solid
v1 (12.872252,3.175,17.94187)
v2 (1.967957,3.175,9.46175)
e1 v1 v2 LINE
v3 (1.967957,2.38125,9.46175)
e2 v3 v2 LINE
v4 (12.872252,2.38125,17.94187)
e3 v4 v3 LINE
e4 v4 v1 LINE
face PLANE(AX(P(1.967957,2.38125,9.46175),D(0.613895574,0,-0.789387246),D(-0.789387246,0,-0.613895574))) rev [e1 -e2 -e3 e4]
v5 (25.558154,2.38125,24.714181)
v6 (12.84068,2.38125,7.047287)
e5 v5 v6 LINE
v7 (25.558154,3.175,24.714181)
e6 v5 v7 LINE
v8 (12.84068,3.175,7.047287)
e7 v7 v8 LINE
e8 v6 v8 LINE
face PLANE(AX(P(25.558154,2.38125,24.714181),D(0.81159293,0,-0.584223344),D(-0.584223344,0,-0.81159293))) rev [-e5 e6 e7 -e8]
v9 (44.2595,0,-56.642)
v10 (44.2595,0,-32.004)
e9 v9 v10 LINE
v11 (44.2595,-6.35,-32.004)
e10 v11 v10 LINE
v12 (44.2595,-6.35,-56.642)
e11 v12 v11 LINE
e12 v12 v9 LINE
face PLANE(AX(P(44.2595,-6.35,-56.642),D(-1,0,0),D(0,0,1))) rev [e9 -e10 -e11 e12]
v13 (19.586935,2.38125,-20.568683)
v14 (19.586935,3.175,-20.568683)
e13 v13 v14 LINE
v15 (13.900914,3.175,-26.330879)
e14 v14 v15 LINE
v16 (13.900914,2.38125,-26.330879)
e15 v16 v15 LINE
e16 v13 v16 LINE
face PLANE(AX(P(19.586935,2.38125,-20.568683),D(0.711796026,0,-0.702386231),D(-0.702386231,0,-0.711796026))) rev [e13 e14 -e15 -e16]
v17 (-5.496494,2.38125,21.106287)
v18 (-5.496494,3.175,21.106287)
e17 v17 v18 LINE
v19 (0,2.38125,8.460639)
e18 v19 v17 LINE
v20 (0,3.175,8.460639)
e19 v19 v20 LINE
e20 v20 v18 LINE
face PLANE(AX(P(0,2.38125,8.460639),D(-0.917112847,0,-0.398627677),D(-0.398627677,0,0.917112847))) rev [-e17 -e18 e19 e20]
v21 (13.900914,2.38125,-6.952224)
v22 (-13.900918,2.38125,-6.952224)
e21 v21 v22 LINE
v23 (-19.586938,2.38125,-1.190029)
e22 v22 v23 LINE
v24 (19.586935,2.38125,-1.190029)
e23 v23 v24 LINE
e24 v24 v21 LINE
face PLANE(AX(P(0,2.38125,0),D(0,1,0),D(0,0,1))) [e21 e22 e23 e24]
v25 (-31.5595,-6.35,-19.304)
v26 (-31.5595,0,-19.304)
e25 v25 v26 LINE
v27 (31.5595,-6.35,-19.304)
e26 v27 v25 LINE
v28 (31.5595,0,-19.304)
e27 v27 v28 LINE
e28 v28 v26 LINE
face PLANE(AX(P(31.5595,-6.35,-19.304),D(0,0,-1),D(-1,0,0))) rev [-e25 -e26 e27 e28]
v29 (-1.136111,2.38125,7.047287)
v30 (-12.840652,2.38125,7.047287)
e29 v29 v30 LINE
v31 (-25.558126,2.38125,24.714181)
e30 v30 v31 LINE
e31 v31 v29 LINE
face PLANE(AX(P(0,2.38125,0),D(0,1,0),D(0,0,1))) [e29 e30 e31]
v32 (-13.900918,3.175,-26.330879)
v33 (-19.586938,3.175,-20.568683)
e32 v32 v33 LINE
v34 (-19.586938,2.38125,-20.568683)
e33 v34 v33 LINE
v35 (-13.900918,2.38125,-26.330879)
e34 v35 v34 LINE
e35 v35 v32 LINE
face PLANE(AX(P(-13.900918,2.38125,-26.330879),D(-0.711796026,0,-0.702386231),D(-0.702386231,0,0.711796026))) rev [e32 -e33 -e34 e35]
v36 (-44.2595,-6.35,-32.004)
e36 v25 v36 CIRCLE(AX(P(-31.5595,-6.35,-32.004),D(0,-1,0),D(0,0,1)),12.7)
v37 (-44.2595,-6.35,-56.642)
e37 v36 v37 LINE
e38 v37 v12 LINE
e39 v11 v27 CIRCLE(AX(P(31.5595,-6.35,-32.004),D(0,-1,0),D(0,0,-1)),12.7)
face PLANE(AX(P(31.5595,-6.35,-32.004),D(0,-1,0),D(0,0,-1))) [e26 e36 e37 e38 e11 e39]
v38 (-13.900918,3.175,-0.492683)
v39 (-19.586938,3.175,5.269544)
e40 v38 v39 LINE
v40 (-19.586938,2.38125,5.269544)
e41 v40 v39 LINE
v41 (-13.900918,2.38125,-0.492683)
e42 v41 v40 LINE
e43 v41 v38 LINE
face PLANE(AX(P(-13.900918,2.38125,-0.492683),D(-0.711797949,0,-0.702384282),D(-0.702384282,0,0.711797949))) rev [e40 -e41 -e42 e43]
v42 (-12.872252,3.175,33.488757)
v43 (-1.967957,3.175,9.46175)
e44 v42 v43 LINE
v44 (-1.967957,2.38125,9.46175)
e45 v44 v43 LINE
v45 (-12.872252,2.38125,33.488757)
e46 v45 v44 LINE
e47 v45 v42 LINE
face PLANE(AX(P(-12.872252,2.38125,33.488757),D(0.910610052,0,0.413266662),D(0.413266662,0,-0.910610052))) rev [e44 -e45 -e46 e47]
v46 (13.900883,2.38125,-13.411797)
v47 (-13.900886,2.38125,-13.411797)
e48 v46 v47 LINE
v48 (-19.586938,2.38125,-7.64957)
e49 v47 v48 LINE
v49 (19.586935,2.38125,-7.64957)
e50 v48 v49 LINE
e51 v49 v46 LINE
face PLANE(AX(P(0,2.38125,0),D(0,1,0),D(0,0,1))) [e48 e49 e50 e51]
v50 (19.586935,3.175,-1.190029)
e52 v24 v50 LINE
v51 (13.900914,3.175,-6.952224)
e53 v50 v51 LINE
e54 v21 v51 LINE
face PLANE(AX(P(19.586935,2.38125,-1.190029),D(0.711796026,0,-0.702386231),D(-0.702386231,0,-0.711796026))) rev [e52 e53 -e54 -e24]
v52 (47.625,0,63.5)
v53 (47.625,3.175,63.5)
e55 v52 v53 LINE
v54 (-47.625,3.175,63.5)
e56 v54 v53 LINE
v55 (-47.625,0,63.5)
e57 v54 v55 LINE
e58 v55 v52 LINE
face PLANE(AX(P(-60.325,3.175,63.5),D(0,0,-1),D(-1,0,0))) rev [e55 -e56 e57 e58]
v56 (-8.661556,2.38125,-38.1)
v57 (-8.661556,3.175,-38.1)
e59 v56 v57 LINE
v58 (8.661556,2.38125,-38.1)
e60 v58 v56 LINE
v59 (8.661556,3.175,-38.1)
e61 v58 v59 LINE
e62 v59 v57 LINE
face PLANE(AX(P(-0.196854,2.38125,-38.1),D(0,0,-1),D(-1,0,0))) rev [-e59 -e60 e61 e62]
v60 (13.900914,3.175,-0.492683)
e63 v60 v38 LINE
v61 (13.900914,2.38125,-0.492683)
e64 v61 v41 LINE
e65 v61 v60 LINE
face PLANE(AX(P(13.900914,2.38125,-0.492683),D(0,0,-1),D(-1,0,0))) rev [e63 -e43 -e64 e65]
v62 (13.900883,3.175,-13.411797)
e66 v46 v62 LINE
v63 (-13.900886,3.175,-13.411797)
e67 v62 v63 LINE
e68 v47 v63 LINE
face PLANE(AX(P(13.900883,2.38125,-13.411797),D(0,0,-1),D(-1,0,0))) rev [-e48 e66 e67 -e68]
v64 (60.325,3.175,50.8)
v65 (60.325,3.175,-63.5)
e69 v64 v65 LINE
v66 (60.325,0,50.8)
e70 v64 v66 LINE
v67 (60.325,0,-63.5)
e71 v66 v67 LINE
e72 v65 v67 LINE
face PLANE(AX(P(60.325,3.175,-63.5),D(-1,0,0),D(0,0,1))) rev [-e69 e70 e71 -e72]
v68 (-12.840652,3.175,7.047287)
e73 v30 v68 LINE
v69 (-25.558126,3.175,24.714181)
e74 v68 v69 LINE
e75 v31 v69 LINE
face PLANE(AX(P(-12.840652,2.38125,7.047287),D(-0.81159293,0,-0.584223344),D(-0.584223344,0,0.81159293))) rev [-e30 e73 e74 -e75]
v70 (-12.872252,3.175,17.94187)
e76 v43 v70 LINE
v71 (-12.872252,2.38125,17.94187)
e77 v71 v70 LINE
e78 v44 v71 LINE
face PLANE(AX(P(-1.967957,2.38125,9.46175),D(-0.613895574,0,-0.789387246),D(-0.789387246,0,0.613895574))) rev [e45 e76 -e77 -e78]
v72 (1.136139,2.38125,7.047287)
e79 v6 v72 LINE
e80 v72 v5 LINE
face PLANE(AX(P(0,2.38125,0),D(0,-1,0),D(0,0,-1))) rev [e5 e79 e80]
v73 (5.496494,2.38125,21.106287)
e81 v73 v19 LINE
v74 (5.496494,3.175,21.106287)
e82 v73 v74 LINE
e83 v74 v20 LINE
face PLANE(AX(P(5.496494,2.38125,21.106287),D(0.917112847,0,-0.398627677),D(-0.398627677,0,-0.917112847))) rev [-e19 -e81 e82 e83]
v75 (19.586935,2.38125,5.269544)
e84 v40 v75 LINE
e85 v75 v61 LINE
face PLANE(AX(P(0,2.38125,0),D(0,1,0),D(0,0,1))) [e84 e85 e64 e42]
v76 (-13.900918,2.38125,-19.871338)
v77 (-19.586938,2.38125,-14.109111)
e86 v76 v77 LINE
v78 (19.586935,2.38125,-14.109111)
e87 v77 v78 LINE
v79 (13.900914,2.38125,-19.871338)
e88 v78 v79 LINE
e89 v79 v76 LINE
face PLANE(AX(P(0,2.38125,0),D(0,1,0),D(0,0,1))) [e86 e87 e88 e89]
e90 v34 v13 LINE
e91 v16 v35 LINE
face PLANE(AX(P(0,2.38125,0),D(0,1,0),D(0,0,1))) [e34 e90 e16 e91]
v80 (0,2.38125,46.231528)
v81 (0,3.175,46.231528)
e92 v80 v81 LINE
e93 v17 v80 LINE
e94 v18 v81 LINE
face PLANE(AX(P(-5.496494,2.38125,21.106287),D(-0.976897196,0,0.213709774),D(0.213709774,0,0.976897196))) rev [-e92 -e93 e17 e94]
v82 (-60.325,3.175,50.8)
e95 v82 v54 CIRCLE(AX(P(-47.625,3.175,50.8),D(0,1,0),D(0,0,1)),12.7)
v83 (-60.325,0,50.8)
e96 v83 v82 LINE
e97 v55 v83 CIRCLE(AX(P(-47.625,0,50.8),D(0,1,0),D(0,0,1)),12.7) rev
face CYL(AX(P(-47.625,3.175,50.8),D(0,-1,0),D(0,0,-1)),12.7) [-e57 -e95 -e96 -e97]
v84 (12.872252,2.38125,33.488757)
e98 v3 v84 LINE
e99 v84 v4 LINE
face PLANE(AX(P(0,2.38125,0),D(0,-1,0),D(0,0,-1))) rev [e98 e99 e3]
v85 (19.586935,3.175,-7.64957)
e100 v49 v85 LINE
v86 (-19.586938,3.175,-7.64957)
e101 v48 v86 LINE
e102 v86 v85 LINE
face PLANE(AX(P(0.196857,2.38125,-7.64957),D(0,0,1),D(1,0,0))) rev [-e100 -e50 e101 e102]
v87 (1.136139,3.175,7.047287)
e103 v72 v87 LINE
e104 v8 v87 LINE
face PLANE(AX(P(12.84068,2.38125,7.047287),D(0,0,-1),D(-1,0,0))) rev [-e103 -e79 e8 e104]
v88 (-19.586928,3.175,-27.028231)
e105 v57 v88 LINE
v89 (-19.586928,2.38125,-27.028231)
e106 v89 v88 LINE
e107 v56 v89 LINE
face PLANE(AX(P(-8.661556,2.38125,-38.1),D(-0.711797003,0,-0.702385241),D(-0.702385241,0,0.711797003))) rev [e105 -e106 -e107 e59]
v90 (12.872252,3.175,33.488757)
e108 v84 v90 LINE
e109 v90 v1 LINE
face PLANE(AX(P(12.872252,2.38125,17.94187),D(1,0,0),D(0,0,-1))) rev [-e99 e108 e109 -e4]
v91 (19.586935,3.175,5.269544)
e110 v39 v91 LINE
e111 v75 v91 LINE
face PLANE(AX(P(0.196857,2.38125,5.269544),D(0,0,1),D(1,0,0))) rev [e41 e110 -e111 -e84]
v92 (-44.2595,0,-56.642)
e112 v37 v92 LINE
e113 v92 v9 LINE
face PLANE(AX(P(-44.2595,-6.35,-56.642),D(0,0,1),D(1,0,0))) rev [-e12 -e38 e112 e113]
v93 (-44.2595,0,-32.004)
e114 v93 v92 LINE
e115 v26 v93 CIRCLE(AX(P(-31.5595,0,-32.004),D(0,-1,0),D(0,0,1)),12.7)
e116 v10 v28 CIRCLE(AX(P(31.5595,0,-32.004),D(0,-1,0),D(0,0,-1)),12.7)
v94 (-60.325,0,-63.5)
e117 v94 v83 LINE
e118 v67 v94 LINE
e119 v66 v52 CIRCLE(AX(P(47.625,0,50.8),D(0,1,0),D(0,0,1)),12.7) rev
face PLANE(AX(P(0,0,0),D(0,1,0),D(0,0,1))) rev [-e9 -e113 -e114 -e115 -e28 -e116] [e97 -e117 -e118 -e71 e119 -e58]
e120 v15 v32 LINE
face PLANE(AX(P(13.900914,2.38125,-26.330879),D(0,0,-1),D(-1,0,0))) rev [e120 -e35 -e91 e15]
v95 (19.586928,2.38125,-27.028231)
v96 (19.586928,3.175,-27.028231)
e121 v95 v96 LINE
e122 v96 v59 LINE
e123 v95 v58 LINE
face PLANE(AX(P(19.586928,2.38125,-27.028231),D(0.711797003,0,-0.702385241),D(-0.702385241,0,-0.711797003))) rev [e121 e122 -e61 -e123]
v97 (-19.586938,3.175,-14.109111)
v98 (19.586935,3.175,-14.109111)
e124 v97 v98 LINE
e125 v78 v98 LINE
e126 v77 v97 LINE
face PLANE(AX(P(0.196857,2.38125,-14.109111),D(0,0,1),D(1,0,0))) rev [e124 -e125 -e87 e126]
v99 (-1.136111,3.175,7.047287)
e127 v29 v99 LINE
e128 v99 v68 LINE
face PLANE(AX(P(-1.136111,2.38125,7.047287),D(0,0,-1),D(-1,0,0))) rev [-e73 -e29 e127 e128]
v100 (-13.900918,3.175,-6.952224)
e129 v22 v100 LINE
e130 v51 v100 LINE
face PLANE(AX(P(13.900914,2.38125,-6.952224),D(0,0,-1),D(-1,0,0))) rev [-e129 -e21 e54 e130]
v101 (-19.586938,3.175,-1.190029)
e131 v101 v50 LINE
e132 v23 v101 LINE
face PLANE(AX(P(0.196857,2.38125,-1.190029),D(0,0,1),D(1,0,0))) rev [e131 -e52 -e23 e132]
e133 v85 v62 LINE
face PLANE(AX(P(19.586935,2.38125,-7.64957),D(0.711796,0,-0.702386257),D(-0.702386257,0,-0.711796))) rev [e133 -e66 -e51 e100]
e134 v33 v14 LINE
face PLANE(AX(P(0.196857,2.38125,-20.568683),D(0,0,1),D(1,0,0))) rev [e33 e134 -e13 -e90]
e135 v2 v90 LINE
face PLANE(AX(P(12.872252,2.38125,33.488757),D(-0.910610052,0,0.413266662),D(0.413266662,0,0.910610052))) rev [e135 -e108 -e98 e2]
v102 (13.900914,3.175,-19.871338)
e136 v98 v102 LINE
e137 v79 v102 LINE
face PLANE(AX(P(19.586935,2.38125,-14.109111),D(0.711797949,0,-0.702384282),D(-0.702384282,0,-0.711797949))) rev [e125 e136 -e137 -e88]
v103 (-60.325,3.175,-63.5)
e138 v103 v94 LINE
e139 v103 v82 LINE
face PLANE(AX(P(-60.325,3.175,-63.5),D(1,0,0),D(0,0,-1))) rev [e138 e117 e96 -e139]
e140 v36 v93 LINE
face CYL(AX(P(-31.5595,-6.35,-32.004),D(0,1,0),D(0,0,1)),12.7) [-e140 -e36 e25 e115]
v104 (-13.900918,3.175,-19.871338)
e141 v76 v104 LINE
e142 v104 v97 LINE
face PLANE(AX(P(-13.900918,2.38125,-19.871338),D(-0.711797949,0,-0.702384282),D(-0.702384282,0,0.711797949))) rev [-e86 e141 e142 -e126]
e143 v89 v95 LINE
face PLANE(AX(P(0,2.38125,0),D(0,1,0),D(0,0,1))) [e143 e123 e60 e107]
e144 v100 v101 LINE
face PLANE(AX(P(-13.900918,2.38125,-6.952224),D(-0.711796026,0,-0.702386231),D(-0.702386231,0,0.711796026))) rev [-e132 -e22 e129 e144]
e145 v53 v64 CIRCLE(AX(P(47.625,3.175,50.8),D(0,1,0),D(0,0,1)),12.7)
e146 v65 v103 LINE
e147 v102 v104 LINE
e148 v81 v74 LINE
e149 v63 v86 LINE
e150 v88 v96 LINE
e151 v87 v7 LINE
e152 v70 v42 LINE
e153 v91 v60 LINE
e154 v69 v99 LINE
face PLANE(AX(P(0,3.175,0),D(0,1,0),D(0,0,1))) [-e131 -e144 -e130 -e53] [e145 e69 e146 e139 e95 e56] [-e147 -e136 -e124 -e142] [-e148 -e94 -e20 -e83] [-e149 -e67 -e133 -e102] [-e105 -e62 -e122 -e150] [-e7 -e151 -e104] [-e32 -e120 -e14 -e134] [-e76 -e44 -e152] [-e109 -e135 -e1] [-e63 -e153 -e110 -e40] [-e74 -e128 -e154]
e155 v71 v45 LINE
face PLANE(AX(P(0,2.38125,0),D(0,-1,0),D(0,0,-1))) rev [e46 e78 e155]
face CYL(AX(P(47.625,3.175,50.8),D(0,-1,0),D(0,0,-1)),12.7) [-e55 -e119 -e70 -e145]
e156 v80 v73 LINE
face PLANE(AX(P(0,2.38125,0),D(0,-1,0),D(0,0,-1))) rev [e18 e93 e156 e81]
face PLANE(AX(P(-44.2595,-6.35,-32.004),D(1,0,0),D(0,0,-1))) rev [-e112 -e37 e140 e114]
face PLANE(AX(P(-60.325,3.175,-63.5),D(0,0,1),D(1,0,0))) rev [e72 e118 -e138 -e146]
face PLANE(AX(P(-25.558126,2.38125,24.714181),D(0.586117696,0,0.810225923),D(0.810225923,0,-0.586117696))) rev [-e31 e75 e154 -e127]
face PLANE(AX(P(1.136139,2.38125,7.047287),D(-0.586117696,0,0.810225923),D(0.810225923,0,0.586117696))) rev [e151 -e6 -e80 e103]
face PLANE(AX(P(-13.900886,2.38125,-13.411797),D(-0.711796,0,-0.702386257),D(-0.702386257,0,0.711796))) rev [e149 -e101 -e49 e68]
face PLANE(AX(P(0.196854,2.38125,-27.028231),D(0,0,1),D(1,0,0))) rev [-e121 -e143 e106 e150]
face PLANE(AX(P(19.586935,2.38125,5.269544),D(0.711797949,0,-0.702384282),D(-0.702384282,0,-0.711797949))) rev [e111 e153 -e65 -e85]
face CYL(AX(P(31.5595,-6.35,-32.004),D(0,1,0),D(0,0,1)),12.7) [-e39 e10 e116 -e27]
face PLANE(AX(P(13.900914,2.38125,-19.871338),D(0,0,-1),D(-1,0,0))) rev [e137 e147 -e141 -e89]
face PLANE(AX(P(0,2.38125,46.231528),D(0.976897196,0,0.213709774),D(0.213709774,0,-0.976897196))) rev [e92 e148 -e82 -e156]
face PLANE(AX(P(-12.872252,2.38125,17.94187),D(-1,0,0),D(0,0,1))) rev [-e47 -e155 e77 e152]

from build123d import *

# Parameters (mm, degrees)
SKETCH1_W           = 120.65
SKETCH1_H           = 127
BOSS_EXTRUDE1_DEPTH = 3.175
FILLET1_R           = 12.7
BOSS_EXTRUDE2_DEPTH = 6.35
CUT_EXTRUDE1_START  = -0.79375
CUT_EXTRUDE1_DEPTH  = 0.79375


# Read off the part's stored shape, not the designer's step: Cut-Extrude1
with BuildPart() as part:
    # Sketch1 → Boss-Extrude1 (new body)
    with BuildSketch(Plane(origin=(0, 0, 0), x_dir=(1, 0, 0), z_dir=(0, 1, 0))):
        Rectangle(SKETCH1_W, SKETCH1_H)
    extrude(amount=BOSS_EXTRUDE1_DEPTH)

    # Fillet1
    fillet1_edges = [part.edges().sort_by_distance(p)[0] for p in [
        (60.325, 1.5875, 63.5),
        (-60.325, 1.5875, 63.5),
    ]]
    fillet(fillet1_edges, radius=FILLET1_R)

    # Sketch2 → Boss-Extrude2 (add)
    with BuildSketch(Plane.XZ):
        with BuildLine():
            Line((-44.2595, -32.004), (-44.2595, -56.642))
            Line((-44.2595, -56.642), (44.2595, -56.642))
            Line((44.2595, -56.642), (44.2595, -32.004))
            ThreePointArc((44.2595, -32.004), (40.539756121, -23.023743879), (31.5595, -19.304))
            Line((31.5595, -19.304), (-31.5595, -19.304))
            ThreePointArc((-31.5595, -19.304), (-40.539756121, -23.023743879), (-44.2595, -32.004))
        make_face()
    extrude(amount=BOSS_EXTRUDE2_DEPTH)

    # Cut-Extrude1 outline → Cut-Extrude1 (cut)
    with BuildSketch(Plane(origin=(0, 3.175, 0), x_dir=(1, 0, 0), z_dir=(0, 1, 0)).offset(CUT_EXTRUDE1_START)):
        Polygon((19.586934791, 20.568683014), (13.900914294, 26.330878533), (-13.900917809, 26.330878533), (-19.586938306, 20.568683014), align=None)
        Polygon((25.558154067, -24.714180755), (12.840680417, -7.047287084), (1.136138921, -7.047287084), align=None)
        Polygon((-25.558126027, -24.714180755), (-1.13611088, -7.047287084), (-12.840652376, -7.047287084), align=None)
        Polygon((12.872252496, -17.941870118), (1.967957375, -9.461750192), (12.872252496, -33.488756649), align=None)
        Polygon((19.586934791, 14.109110528), (13.900914294, 19.871337603), (-13.900917809, 19.871337603), (-19.586938306, 14.109110528), align=None)
        Polygon((19.586934791, 7.649569598), (13.900882739, 13.411796673), (-13.900886254, 13.411796673), (-19.586938306, 7.649569598), align=None)
        Polygon((19.586934791, 1.190028667), (13.900914294, 6.952224187), (-13.900917809, 6.952224187), (-19.586938306, 1.190028667), align=None)
        Polygon((19.586934791, -5.269543818), (13.900914294, 0.492683256), (-13.900917809, 0.492683256), (-19.586938306, -5.269543818), align=None)
        Polygon((0, -8.460639301), (-5.496493939, -21.106287094), (0, -46.231527771), (5.496493939, -21.106287094), align=None)
        Polygon((-1.967957374, -9.461750193), (-12.872252495, -17.941870118), (-12.872252495, -33.488756649), align=None)
        Polygon((8.661555888, 38.1), (-8.661555888, 38.1), (-19.58692752, 27.028231496), (19.58692752, 27.028231496), align=None)
    extrude(amount=CUT_EXTRUDE1_DEPTH, mode=Mode.SUBTRACT)


solid = part.part
